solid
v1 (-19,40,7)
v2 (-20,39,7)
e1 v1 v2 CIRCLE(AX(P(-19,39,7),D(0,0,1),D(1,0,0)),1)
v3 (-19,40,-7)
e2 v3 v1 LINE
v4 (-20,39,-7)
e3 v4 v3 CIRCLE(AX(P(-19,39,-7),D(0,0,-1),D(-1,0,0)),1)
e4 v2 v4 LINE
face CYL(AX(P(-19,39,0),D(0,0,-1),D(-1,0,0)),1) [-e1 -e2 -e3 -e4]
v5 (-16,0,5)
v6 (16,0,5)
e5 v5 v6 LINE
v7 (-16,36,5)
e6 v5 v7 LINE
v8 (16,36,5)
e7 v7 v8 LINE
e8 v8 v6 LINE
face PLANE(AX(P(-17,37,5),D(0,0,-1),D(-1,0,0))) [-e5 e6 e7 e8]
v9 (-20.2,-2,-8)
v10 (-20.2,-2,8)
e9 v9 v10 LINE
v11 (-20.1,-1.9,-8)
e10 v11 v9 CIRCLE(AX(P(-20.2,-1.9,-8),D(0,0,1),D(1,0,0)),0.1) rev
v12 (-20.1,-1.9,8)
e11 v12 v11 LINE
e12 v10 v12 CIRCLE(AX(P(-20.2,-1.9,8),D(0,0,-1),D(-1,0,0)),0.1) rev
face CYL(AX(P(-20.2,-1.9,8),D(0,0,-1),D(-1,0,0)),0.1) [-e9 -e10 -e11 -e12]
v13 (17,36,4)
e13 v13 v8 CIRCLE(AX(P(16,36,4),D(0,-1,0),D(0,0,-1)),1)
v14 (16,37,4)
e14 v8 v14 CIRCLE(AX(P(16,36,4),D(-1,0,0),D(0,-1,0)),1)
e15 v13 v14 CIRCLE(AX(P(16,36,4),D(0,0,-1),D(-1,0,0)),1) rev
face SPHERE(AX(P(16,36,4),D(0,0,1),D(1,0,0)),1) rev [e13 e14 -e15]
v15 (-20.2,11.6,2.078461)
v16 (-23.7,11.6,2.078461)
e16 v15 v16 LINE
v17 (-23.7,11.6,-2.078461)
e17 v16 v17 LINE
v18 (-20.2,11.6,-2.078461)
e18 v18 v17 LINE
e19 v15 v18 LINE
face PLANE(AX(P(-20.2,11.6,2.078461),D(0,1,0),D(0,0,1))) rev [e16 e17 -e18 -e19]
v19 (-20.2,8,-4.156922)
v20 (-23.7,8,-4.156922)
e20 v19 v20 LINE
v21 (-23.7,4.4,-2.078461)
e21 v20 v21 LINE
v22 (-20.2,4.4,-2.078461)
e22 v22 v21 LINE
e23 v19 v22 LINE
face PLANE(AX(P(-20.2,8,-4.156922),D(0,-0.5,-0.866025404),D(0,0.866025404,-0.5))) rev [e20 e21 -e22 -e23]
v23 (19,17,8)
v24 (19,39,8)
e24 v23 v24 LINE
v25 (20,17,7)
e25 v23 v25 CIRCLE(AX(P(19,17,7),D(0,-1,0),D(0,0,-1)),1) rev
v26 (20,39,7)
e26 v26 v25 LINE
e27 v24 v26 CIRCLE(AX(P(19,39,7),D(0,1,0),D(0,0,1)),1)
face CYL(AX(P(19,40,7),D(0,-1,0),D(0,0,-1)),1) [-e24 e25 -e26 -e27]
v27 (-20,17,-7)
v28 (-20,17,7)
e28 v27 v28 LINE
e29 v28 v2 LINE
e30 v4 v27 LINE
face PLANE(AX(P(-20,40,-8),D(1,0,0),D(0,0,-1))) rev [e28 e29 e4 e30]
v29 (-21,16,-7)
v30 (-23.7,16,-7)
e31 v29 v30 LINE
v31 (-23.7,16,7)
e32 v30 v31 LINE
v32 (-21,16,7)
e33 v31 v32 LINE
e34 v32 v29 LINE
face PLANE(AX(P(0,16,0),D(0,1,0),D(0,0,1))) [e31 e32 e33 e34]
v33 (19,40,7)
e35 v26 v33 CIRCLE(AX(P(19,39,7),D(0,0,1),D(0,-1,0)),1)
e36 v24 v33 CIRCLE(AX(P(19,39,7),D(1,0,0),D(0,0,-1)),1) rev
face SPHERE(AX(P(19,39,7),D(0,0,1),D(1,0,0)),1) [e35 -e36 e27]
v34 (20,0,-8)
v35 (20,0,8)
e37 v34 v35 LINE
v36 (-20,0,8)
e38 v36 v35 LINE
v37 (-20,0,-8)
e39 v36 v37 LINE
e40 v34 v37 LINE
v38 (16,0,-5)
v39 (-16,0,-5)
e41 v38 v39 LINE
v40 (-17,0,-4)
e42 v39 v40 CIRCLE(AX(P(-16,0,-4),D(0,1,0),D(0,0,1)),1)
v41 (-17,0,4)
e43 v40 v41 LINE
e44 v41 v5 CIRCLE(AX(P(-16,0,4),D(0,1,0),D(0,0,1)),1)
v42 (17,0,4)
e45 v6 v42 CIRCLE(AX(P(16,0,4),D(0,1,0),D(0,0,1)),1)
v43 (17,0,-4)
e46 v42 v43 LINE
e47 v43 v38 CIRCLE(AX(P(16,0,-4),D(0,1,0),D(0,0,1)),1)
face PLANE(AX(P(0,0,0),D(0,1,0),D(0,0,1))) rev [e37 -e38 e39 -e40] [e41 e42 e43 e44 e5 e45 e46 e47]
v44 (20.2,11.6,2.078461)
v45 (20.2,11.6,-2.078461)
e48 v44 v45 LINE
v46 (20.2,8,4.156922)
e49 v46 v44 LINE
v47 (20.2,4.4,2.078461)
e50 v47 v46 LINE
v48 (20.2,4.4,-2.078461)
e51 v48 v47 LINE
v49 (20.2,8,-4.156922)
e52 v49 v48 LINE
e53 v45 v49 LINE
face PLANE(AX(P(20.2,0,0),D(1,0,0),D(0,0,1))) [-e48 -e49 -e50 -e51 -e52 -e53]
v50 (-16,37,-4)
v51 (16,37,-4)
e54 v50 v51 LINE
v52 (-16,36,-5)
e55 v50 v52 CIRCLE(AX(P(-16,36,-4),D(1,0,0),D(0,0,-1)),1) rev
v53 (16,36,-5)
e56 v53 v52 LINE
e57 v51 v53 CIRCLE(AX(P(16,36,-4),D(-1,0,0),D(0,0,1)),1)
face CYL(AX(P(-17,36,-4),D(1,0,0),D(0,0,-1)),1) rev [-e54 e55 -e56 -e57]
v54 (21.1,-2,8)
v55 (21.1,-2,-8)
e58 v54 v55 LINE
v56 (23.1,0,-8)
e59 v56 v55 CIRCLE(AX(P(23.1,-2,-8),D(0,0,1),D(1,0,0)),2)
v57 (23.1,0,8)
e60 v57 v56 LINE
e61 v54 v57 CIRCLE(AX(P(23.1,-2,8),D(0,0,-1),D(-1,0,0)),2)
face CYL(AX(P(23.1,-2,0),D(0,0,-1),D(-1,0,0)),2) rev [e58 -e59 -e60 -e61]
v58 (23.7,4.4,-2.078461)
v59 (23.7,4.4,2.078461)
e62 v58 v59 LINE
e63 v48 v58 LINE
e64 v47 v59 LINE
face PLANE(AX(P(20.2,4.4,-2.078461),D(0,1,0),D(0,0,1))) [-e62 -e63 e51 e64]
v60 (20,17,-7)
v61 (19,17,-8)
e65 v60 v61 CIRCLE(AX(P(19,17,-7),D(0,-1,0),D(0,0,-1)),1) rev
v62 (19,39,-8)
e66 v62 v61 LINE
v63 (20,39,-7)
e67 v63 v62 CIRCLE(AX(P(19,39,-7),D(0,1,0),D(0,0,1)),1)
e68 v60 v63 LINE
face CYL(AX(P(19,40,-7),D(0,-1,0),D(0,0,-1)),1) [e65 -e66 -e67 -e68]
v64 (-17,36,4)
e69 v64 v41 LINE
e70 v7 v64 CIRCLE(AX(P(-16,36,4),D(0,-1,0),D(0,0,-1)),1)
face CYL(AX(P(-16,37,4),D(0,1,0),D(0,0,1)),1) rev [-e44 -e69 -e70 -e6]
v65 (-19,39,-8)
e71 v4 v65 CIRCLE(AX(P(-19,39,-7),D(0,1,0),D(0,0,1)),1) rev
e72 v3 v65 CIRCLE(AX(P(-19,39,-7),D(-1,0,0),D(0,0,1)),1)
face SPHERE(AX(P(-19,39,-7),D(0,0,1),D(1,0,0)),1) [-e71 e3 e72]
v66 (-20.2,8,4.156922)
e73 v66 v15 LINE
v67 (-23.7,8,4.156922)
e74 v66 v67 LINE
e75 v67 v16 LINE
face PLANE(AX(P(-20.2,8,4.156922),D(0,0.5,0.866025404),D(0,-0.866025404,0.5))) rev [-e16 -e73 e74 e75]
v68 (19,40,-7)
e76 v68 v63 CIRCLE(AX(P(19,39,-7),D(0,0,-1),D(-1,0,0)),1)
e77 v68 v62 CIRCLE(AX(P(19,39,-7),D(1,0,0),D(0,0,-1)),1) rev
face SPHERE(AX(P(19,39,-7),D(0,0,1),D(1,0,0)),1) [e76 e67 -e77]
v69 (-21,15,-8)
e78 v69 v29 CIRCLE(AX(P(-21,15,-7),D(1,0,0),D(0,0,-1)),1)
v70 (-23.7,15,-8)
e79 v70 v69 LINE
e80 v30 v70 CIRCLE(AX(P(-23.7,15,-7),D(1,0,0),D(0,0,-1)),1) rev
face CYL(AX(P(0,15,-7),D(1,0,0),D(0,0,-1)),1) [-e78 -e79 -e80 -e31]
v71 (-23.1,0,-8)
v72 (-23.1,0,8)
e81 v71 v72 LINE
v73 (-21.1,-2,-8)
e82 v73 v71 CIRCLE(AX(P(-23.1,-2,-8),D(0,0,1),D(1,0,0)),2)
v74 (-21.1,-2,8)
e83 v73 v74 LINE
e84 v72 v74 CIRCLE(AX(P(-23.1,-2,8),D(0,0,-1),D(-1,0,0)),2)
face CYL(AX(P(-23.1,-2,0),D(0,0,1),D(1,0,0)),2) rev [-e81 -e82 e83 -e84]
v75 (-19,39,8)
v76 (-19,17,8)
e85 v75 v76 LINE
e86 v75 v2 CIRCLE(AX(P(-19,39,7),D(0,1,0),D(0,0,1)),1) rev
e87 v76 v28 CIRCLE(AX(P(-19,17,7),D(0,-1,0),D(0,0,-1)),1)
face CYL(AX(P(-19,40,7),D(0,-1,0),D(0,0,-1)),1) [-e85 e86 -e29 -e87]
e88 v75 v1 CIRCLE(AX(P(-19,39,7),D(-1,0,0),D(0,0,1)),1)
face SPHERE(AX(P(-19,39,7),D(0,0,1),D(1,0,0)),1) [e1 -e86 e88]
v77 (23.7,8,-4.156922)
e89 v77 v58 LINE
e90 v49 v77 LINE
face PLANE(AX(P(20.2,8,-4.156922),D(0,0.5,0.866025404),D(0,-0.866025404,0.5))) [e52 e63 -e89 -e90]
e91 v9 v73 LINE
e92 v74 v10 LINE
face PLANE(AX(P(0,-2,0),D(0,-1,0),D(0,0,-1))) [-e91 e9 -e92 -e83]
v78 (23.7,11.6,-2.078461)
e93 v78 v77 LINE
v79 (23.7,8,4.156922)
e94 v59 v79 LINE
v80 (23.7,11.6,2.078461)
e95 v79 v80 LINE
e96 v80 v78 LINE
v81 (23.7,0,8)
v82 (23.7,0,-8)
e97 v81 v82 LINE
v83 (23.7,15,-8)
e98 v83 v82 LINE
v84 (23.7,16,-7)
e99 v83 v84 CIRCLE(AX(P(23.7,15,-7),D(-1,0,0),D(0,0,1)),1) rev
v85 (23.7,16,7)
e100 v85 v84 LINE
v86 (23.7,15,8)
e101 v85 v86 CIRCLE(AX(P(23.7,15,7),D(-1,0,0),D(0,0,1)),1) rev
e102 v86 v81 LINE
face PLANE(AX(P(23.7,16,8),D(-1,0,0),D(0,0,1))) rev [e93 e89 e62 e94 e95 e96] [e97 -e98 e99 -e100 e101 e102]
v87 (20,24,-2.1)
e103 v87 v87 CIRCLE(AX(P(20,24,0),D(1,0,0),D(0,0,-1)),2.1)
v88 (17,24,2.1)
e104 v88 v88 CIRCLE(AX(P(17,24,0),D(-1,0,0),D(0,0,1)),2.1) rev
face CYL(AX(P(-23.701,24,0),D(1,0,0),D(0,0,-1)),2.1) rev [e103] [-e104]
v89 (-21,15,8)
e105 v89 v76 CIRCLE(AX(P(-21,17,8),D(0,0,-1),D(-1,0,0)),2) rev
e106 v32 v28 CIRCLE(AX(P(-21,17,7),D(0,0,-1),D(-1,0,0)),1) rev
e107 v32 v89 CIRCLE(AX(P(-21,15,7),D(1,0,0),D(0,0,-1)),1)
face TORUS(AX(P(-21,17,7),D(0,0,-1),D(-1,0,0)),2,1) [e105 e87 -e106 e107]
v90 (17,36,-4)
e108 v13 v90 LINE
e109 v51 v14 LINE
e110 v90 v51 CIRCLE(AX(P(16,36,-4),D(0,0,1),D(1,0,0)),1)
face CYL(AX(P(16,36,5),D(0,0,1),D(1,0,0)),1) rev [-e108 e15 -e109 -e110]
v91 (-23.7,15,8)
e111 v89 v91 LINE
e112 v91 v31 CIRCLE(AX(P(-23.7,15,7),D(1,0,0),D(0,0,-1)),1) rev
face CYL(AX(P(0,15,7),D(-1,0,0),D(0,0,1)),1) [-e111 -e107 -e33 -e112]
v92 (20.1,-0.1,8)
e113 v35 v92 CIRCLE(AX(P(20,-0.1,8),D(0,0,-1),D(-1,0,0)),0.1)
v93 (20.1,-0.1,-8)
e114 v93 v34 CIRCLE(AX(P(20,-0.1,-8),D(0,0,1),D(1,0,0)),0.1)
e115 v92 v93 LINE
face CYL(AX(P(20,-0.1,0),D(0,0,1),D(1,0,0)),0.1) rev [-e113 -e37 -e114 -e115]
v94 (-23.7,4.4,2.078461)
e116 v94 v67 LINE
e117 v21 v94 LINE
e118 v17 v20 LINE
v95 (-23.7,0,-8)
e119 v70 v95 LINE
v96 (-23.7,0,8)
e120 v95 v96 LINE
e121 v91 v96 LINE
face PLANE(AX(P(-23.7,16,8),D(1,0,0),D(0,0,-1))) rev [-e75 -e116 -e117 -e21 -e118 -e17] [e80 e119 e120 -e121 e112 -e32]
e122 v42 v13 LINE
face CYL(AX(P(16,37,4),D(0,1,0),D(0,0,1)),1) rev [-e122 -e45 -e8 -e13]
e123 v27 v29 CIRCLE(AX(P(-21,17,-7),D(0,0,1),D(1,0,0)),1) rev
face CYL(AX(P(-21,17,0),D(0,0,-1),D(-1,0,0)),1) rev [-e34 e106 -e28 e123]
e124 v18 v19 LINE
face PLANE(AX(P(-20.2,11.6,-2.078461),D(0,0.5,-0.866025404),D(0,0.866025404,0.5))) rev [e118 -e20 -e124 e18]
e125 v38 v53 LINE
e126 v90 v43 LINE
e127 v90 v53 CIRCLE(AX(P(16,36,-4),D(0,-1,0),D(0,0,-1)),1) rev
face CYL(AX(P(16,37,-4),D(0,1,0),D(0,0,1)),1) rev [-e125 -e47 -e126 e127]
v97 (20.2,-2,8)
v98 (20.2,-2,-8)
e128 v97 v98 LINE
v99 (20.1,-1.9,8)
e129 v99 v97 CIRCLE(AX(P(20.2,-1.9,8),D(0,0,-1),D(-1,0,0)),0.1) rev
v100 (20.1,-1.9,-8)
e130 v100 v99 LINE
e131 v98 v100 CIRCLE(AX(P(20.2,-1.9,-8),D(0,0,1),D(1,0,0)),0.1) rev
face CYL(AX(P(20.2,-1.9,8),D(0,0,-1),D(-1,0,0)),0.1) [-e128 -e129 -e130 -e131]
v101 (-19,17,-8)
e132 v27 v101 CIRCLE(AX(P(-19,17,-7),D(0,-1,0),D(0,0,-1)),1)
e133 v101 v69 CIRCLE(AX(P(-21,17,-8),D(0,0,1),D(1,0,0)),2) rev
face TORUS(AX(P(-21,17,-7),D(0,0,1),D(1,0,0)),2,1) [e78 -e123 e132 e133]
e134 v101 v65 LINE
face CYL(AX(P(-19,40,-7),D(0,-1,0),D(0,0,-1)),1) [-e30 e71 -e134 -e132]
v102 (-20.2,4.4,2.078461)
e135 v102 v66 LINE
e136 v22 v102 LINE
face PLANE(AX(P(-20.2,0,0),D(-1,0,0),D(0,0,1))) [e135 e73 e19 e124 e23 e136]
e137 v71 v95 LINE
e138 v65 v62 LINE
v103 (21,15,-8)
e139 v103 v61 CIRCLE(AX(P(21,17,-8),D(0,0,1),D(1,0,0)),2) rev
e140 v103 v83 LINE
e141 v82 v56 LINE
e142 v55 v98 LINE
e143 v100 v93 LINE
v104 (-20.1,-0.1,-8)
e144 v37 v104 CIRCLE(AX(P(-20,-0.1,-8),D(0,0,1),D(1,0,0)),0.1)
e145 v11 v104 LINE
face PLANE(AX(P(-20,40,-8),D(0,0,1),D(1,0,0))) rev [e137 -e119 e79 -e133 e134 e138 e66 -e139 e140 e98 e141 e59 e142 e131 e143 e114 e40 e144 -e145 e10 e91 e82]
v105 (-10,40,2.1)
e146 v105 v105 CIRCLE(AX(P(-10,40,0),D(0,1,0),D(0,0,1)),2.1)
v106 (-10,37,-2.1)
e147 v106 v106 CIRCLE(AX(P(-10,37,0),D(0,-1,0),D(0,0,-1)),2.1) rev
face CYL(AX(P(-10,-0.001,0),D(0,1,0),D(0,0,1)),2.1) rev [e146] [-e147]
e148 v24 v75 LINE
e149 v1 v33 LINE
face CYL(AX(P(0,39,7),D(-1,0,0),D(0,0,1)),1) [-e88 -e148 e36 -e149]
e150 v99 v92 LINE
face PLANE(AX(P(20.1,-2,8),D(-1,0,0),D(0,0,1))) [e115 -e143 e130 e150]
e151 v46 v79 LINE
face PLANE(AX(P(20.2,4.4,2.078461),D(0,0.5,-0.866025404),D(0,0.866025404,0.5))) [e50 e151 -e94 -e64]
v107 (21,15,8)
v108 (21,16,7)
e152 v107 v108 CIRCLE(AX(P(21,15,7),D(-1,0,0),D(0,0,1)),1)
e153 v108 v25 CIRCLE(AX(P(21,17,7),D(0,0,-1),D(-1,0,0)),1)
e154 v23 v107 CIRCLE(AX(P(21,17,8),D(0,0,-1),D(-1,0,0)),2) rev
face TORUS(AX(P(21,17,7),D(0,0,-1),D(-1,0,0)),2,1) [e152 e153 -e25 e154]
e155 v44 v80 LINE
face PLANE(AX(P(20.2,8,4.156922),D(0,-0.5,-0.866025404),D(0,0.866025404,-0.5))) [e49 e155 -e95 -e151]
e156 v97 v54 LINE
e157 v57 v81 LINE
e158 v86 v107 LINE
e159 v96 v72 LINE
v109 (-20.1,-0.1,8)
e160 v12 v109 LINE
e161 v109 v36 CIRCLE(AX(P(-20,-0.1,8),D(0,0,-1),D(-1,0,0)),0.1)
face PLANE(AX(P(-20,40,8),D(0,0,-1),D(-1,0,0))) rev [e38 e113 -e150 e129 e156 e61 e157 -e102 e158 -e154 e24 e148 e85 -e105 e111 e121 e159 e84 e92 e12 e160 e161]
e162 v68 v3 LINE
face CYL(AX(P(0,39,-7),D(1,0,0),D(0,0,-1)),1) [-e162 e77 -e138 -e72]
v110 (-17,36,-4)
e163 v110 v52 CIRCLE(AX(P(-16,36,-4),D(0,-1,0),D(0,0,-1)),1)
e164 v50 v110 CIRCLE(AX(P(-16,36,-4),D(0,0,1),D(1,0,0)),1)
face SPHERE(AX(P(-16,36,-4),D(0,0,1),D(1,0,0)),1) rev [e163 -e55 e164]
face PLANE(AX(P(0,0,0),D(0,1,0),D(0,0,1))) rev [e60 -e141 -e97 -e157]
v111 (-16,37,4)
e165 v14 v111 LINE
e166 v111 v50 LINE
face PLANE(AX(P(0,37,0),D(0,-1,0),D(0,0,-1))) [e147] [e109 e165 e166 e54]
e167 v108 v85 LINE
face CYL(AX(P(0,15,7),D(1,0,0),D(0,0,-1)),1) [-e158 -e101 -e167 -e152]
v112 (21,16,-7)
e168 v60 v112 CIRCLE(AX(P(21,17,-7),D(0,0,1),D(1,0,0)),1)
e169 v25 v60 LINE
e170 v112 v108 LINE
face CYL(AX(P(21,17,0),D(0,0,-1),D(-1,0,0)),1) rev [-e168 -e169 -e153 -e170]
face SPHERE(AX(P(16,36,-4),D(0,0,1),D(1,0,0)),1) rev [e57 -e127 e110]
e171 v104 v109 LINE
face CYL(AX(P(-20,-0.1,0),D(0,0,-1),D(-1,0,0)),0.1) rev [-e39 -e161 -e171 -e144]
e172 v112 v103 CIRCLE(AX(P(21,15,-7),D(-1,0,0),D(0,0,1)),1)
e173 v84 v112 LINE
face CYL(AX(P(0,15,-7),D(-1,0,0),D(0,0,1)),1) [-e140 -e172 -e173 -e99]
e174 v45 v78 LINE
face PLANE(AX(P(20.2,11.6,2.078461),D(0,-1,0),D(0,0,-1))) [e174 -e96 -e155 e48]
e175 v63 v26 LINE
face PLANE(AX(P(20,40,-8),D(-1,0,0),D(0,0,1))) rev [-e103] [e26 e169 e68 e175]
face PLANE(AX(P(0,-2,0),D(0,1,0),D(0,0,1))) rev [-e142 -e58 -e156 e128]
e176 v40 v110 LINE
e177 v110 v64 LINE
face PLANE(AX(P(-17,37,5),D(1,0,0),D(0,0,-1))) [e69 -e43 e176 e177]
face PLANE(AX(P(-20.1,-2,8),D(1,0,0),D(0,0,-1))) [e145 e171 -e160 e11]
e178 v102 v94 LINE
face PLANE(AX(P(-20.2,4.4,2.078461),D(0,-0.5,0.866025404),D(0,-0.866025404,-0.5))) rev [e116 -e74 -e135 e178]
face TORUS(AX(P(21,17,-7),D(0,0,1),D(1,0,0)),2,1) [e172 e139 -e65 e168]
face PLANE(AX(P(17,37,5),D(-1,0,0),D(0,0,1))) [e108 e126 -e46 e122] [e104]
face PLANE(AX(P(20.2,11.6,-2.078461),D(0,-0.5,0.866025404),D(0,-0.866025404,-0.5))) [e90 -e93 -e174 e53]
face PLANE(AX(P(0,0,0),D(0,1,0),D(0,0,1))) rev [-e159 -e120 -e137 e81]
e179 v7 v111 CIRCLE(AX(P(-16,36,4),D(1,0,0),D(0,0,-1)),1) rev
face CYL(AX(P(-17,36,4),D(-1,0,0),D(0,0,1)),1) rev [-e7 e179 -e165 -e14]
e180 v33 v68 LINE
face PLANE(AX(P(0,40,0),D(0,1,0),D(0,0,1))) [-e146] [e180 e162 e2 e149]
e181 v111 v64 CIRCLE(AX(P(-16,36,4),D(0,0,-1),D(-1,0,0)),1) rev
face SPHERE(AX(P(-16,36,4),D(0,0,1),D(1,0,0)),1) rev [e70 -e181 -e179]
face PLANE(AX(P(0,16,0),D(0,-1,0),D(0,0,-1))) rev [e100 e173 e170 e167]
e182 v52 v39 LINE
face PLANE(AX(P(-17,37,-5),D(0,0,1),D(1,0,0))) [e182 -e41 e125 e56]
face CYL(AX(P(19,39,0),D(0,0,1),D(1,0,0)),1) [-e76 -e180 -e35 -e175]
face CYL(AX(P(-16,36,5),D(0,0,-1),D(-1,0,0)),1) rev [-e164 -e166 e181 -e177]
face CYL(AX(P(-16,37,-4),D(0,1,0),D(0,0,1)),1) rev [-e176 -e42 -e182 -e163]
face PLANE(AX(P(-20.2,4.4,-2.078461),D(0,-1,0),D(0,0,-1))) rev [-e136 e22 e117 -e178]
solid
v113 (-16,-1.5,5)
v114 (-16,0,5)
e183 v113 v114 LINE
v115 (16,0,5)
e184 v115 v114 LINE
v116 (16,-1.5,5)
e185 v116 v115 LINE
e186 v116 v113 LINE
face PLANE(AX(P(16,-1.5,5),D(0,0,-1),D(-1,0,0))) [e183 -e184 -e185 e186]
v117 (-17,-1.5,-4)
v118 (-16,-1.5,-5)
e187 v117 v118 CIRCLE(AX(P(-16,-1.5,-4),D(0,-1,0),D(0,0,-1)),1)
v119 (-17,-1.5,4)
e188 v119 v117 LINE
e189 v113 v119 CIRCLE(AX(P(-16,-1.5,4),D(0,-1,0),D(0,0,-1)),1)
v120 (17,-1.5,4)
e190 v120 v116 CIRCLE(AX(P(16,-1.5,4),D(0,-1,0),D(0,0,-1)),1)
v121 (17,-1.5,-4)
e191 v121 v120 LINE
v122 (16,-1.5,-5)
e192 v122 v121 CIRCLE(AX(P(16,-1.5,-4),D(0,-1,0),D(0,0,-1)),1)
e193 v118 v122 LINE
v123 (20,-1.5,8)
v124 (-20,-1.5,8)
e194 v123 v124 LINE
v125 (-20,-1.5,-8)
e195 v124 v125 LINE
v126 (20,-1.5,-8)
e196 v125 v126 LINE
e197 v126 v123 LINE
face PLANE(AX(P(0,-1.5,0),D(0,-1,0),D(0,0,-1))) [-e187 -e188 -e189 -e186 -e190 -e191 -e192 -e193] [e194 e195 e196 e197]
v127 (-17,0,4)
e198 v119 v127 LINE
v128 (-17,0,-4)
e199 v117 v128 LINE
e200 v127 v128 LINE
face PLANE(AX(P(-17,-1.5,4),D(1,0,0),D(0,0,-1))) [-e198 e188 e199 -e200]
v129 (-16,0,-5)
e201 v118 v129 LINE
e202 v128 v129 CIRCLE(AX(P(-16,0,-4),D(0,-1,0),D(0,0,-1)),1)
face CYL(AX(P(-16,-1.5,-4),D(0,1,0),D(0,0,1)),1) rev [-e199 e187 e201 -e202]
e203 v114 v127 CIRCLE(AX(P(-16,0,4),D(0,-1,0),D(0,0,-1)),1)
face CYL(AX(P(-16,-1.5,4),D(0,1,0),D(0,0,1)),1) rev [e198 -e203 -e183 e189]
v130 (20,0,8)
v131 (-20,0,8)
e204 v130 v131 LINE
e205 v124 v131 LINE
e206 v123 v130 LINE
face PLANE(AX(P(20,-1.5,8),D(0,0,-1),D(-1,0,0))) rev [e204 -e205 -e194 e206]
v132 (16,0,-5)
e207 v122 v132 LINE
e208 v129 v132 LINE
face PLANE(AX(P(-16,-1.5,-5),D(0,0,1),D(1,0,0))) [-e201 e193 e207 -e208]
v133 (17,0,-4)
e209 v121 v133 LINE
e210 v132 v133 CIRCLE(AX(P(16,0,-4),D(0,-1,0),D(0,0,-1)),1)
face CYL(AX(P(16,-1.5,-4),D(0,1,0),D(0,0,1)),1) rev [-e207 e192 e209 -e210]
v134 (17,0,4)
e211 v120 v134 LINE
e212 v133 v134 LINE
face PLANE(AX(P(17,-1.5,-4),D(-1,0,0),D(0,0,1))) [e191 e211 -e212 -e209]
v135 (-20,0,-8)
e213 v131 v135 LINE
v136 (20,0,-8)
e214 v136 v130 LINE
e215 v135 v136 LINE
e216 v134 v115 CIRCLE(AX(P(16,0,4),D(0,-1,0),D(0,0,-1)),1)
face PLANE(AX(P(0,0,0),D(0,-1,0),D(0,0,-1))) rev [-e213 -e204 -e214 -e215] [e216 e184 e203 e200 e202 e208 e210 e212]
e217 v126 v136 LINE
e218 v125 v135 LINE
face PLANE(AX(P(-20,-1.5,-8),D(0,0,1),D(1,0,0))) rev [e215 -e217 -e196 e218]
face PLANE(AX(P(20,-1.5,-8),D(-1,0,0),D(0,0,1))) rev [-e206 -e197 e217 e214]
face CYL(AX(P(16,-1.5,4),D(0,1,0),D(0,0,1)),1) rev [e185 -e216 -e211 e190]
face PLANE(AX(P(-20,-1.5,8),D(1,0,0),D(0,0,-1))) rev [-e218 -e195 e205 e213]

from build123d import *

# Parameters (mm, degrees)
SKETCH1_W               = 40
SKETCH1_H               = 16
BODY_DEPTH              = 40
SKETCH2_W               = 3.7
SKETCH2_H               = 16
EXTENSION_DEPTH         = 16
SKETCH5_W               = 34
SKETCH5_H               = 10
CAVITY_DEPTH            = 37
TOP_HOLE_REACH          = 49.177
SKETCH6_R               = 2.1
SIDE_HOLE_REACH         = 61.78
SKETCH7_R               = 2.1
SKETCH3_W               = 1
SKETCH3_H               = 16
LEGS_DEPTH              = 2
MOUNT_COUNTERBORE_DEPTH = 3.5
F_2MM_LEG_FILLET_R      = 2
F_0_1MM_LEG_FILLET_R    = 0.1
OUTER_BOUNDARY_FILLET_R = 1
INNER_BOUNDARY_FILLET_R = 1
SKETCH8_W               = 40
SKETCH8_H               = 16
BOSS_EXTRUDE1_DEPTH     = 1.5


with BuildPart() as part:
    # Sketch1 → Body (new body)
    with BuildSketch(Plane(origin=(0, 0, 0), x_dir=(1, 0, 0), z_dir=(0, 1, 0))):
        Rectangle(SKETCH1_W, SKETCH1_H)
    extrude(amount=BODY_DEPTH)

    # Sketch2 → Extension (add)
    with BuildSketch(Plane(origin=(0, 0, 0), x_dir=(1, 0, 0), z_dir=(0, 1, 0))):
        with Locations((-21.85, 0)):
            Rectangle(SKETCH2_W, SKETCH2_H)
        with Locations((21.85, 0)):
            Rectangle(SKETCH2_W, SKETCH2_H)
    extrude(amount=EXTENSION_DEPTH)

    # Sketch5 → Cavity (cut)
    with BuildSketch(Plane(origin=(0, 0, 0), x_dir=(1, 0, 0), z_dir=(0, 1, 0))):
        Rectangle(SKETCH5_W, SKETCH5_H)
    extrude(amount=CAVITY_DEPTH, mode=Mode.SUBTRACT)

    # Sketch6 → Top Hole (cut, up to next)
    with BuildSketch(Plane(origin=(0, 40, 0), x_dir=(1, 0, 0), z_dir=(0, 1, 0)), mode=Mode.PRIVATE) as top_hole_sk1:
        with Locations(Location((-10, 0, 0), (0, 0, 270))):
            Circle(SKETCH6_R)
    top_hole_tool1 = extrude(top_hole_sk1.sketch, amount=-TOP_HOLE_REACH, mode=Mode.PRIVATE) & part.part
    add(top_hole_tool1.solids().sort_by_distance((-10, 40, 0))[0], mode=Mode.SUBTRACT)

    # Sketch7 → Side Hole (cut, up to next)
    with BuildSketch(Plane(origin=(20, 0, 0), x_dir=(0, 0, -1), z_dir=(1, 0, 0)), mode=Mode.PRIVATE) as side_hole_sk1:
        with Locations((0, 24)):
            Circle(SKETCH7_R)
    side_hole_tool1 = extrude(side_hole_sk1.sketch, amount=-SIDE_HOLE_REACH, mode=Mode.PRIVATE) & part.part
    add(side_hole_tool1.solids().sort_by_distance((20, 24, 0))[0], mode=Mode.SUBTRACT)

    # Sketch3 → Legs (add)
    with BuildSketch(Plane(origin=(0, 0, 0), x_dir=(1, 0, 0), z_dir=(0, 1, 0))):
        with Locations((-20.6, 0)):
            Rectangle(SKETCH3_W, SKETCH3_H)
        with Locations((20.6, 0)):
            Rectangle(SKETCH3_W, SKETCH3_H)
    extrude(amount=-LEGS_DEPTH)

    # Sketch4 → Mount Counterbore (cut)
    with BuildSketch(Plane.ZY.offset(23.7)):
        Polygon((2.078460969, 11.6), (-2.078460969, 11.6), (-4.156921938, 8), (-2.078460969, 4.4), (2.078460969, 4.4), (4.156921938, 8), align=None)
    mount_counterbore = extrude(amount=-MOUNT_COUNTERBORE_DEPTH, mode=Mode.SUBTRACT)

    # Mount Counterbore Mirror: Mount Counterbore across plane
    add(mount_counterbore.mirror(Plane(origin=(0, 0, 0), x_dir=(0, 0, 1), z_dir=(1, 0, 0))), mode=Mode.SUBTRACT)

    # 2mm Leg Fillet
    f_2mm_leg_fillet_edges = [part.edges().sort_by_distance(p)[0] for p in [
        (-21.1, 0, 0),
        (21.1, 0, 0),
    ]]
    fillet(f_2mm_leg_fillet_edges, radius=F_2MM_LEG_FILLET_R - 0.0001)  # a hair under: the kernel refuses the full size

    # 0.1mm Leg Fillet
    f_0_1mm_leg_fillet_edges = [part.edges().sort_by_distance(p)[0] for p in [
        (-20.1, -2, 0),
        (-20.1, 0, 0),
        (20.1, -2, 0),
        (20.1, 0, 0),
    ]]
    fillet(f_0_1mm_leg_fillet_edges, radius=F_0_1MM_LEG_FILLET_R)

    # Outer Boundary Fillet
    outer_boundary_fillet_edges = [part.edges().sort_by_distance(p)[0] for p in [
        (20, 40, 0),
        (-20, 16, 0),
        (-21.85, 16, -8),
        (0, 40, -8),
        (-21.85, 16, 8),
        (20, 16, 0),
        (21.85, 16, 8),
        (21.85, 16, -8),
        (-20, 40, 0),
        (-20, 28, -8),
        (20, 28, -8),
        (20, 28, 8),
        (-20, 28, 8),
        (0, 40, 8),
    ]]
    fillet(outer_boundary_fillet_edges, radius=OUTER_BOUNDARY_FILLET_R)

    # Inner Boundary Fillet
    inner_boundary_fillet_edges = [part.edges().sort_by_distance(p)[0] for p in [
        (-17, 18.5, -5),
        (-17, 18.5, 5),
        (17, 18.5, 5),
        (17, 18.5, -5),
        (-17, 37, 0),
        (0, 37, 5),
        (17, 37, 0),
        (0, 37, -5),
    ]]
    fillet(inner_boundary_fillet_edges, radius=INNER_BOUNDARY_FILLET_R)


with BuildPart() as body_2:
    # Sketch8 → Boss-Extrude1 (new body)
    with BuildSketch(Plane.XZ):
        Rectangle(SKETCH8_W, SKETCH8_H)
        with BuildLine():
            Line((-16, -5), (16, -5))
            ThreePointArc((16, -5), (16.707106781, -4.707106781), (17, -4))
            Line((17, -4), (17, 4))
            ThreePointArc((17, 4), (16.707106781, 4.707106781), (16, 5))
            Line((16, 5), (-16, 5))
            ThreePointArc((-16, 5), (-16.707106781, 4.707106781), (-17, 4))
            Line((-17, 4), (-17, -4))
            ThreePointArc((-17, -4), (-16.707106781, -4.707106781), (-16, -5))
        make_face(mode=Mode.SUBTRACT)
    extrude(amount=BOSS_EXTRUDE1_DEPTH)


solid = Compound([part.part, body_2.part])
